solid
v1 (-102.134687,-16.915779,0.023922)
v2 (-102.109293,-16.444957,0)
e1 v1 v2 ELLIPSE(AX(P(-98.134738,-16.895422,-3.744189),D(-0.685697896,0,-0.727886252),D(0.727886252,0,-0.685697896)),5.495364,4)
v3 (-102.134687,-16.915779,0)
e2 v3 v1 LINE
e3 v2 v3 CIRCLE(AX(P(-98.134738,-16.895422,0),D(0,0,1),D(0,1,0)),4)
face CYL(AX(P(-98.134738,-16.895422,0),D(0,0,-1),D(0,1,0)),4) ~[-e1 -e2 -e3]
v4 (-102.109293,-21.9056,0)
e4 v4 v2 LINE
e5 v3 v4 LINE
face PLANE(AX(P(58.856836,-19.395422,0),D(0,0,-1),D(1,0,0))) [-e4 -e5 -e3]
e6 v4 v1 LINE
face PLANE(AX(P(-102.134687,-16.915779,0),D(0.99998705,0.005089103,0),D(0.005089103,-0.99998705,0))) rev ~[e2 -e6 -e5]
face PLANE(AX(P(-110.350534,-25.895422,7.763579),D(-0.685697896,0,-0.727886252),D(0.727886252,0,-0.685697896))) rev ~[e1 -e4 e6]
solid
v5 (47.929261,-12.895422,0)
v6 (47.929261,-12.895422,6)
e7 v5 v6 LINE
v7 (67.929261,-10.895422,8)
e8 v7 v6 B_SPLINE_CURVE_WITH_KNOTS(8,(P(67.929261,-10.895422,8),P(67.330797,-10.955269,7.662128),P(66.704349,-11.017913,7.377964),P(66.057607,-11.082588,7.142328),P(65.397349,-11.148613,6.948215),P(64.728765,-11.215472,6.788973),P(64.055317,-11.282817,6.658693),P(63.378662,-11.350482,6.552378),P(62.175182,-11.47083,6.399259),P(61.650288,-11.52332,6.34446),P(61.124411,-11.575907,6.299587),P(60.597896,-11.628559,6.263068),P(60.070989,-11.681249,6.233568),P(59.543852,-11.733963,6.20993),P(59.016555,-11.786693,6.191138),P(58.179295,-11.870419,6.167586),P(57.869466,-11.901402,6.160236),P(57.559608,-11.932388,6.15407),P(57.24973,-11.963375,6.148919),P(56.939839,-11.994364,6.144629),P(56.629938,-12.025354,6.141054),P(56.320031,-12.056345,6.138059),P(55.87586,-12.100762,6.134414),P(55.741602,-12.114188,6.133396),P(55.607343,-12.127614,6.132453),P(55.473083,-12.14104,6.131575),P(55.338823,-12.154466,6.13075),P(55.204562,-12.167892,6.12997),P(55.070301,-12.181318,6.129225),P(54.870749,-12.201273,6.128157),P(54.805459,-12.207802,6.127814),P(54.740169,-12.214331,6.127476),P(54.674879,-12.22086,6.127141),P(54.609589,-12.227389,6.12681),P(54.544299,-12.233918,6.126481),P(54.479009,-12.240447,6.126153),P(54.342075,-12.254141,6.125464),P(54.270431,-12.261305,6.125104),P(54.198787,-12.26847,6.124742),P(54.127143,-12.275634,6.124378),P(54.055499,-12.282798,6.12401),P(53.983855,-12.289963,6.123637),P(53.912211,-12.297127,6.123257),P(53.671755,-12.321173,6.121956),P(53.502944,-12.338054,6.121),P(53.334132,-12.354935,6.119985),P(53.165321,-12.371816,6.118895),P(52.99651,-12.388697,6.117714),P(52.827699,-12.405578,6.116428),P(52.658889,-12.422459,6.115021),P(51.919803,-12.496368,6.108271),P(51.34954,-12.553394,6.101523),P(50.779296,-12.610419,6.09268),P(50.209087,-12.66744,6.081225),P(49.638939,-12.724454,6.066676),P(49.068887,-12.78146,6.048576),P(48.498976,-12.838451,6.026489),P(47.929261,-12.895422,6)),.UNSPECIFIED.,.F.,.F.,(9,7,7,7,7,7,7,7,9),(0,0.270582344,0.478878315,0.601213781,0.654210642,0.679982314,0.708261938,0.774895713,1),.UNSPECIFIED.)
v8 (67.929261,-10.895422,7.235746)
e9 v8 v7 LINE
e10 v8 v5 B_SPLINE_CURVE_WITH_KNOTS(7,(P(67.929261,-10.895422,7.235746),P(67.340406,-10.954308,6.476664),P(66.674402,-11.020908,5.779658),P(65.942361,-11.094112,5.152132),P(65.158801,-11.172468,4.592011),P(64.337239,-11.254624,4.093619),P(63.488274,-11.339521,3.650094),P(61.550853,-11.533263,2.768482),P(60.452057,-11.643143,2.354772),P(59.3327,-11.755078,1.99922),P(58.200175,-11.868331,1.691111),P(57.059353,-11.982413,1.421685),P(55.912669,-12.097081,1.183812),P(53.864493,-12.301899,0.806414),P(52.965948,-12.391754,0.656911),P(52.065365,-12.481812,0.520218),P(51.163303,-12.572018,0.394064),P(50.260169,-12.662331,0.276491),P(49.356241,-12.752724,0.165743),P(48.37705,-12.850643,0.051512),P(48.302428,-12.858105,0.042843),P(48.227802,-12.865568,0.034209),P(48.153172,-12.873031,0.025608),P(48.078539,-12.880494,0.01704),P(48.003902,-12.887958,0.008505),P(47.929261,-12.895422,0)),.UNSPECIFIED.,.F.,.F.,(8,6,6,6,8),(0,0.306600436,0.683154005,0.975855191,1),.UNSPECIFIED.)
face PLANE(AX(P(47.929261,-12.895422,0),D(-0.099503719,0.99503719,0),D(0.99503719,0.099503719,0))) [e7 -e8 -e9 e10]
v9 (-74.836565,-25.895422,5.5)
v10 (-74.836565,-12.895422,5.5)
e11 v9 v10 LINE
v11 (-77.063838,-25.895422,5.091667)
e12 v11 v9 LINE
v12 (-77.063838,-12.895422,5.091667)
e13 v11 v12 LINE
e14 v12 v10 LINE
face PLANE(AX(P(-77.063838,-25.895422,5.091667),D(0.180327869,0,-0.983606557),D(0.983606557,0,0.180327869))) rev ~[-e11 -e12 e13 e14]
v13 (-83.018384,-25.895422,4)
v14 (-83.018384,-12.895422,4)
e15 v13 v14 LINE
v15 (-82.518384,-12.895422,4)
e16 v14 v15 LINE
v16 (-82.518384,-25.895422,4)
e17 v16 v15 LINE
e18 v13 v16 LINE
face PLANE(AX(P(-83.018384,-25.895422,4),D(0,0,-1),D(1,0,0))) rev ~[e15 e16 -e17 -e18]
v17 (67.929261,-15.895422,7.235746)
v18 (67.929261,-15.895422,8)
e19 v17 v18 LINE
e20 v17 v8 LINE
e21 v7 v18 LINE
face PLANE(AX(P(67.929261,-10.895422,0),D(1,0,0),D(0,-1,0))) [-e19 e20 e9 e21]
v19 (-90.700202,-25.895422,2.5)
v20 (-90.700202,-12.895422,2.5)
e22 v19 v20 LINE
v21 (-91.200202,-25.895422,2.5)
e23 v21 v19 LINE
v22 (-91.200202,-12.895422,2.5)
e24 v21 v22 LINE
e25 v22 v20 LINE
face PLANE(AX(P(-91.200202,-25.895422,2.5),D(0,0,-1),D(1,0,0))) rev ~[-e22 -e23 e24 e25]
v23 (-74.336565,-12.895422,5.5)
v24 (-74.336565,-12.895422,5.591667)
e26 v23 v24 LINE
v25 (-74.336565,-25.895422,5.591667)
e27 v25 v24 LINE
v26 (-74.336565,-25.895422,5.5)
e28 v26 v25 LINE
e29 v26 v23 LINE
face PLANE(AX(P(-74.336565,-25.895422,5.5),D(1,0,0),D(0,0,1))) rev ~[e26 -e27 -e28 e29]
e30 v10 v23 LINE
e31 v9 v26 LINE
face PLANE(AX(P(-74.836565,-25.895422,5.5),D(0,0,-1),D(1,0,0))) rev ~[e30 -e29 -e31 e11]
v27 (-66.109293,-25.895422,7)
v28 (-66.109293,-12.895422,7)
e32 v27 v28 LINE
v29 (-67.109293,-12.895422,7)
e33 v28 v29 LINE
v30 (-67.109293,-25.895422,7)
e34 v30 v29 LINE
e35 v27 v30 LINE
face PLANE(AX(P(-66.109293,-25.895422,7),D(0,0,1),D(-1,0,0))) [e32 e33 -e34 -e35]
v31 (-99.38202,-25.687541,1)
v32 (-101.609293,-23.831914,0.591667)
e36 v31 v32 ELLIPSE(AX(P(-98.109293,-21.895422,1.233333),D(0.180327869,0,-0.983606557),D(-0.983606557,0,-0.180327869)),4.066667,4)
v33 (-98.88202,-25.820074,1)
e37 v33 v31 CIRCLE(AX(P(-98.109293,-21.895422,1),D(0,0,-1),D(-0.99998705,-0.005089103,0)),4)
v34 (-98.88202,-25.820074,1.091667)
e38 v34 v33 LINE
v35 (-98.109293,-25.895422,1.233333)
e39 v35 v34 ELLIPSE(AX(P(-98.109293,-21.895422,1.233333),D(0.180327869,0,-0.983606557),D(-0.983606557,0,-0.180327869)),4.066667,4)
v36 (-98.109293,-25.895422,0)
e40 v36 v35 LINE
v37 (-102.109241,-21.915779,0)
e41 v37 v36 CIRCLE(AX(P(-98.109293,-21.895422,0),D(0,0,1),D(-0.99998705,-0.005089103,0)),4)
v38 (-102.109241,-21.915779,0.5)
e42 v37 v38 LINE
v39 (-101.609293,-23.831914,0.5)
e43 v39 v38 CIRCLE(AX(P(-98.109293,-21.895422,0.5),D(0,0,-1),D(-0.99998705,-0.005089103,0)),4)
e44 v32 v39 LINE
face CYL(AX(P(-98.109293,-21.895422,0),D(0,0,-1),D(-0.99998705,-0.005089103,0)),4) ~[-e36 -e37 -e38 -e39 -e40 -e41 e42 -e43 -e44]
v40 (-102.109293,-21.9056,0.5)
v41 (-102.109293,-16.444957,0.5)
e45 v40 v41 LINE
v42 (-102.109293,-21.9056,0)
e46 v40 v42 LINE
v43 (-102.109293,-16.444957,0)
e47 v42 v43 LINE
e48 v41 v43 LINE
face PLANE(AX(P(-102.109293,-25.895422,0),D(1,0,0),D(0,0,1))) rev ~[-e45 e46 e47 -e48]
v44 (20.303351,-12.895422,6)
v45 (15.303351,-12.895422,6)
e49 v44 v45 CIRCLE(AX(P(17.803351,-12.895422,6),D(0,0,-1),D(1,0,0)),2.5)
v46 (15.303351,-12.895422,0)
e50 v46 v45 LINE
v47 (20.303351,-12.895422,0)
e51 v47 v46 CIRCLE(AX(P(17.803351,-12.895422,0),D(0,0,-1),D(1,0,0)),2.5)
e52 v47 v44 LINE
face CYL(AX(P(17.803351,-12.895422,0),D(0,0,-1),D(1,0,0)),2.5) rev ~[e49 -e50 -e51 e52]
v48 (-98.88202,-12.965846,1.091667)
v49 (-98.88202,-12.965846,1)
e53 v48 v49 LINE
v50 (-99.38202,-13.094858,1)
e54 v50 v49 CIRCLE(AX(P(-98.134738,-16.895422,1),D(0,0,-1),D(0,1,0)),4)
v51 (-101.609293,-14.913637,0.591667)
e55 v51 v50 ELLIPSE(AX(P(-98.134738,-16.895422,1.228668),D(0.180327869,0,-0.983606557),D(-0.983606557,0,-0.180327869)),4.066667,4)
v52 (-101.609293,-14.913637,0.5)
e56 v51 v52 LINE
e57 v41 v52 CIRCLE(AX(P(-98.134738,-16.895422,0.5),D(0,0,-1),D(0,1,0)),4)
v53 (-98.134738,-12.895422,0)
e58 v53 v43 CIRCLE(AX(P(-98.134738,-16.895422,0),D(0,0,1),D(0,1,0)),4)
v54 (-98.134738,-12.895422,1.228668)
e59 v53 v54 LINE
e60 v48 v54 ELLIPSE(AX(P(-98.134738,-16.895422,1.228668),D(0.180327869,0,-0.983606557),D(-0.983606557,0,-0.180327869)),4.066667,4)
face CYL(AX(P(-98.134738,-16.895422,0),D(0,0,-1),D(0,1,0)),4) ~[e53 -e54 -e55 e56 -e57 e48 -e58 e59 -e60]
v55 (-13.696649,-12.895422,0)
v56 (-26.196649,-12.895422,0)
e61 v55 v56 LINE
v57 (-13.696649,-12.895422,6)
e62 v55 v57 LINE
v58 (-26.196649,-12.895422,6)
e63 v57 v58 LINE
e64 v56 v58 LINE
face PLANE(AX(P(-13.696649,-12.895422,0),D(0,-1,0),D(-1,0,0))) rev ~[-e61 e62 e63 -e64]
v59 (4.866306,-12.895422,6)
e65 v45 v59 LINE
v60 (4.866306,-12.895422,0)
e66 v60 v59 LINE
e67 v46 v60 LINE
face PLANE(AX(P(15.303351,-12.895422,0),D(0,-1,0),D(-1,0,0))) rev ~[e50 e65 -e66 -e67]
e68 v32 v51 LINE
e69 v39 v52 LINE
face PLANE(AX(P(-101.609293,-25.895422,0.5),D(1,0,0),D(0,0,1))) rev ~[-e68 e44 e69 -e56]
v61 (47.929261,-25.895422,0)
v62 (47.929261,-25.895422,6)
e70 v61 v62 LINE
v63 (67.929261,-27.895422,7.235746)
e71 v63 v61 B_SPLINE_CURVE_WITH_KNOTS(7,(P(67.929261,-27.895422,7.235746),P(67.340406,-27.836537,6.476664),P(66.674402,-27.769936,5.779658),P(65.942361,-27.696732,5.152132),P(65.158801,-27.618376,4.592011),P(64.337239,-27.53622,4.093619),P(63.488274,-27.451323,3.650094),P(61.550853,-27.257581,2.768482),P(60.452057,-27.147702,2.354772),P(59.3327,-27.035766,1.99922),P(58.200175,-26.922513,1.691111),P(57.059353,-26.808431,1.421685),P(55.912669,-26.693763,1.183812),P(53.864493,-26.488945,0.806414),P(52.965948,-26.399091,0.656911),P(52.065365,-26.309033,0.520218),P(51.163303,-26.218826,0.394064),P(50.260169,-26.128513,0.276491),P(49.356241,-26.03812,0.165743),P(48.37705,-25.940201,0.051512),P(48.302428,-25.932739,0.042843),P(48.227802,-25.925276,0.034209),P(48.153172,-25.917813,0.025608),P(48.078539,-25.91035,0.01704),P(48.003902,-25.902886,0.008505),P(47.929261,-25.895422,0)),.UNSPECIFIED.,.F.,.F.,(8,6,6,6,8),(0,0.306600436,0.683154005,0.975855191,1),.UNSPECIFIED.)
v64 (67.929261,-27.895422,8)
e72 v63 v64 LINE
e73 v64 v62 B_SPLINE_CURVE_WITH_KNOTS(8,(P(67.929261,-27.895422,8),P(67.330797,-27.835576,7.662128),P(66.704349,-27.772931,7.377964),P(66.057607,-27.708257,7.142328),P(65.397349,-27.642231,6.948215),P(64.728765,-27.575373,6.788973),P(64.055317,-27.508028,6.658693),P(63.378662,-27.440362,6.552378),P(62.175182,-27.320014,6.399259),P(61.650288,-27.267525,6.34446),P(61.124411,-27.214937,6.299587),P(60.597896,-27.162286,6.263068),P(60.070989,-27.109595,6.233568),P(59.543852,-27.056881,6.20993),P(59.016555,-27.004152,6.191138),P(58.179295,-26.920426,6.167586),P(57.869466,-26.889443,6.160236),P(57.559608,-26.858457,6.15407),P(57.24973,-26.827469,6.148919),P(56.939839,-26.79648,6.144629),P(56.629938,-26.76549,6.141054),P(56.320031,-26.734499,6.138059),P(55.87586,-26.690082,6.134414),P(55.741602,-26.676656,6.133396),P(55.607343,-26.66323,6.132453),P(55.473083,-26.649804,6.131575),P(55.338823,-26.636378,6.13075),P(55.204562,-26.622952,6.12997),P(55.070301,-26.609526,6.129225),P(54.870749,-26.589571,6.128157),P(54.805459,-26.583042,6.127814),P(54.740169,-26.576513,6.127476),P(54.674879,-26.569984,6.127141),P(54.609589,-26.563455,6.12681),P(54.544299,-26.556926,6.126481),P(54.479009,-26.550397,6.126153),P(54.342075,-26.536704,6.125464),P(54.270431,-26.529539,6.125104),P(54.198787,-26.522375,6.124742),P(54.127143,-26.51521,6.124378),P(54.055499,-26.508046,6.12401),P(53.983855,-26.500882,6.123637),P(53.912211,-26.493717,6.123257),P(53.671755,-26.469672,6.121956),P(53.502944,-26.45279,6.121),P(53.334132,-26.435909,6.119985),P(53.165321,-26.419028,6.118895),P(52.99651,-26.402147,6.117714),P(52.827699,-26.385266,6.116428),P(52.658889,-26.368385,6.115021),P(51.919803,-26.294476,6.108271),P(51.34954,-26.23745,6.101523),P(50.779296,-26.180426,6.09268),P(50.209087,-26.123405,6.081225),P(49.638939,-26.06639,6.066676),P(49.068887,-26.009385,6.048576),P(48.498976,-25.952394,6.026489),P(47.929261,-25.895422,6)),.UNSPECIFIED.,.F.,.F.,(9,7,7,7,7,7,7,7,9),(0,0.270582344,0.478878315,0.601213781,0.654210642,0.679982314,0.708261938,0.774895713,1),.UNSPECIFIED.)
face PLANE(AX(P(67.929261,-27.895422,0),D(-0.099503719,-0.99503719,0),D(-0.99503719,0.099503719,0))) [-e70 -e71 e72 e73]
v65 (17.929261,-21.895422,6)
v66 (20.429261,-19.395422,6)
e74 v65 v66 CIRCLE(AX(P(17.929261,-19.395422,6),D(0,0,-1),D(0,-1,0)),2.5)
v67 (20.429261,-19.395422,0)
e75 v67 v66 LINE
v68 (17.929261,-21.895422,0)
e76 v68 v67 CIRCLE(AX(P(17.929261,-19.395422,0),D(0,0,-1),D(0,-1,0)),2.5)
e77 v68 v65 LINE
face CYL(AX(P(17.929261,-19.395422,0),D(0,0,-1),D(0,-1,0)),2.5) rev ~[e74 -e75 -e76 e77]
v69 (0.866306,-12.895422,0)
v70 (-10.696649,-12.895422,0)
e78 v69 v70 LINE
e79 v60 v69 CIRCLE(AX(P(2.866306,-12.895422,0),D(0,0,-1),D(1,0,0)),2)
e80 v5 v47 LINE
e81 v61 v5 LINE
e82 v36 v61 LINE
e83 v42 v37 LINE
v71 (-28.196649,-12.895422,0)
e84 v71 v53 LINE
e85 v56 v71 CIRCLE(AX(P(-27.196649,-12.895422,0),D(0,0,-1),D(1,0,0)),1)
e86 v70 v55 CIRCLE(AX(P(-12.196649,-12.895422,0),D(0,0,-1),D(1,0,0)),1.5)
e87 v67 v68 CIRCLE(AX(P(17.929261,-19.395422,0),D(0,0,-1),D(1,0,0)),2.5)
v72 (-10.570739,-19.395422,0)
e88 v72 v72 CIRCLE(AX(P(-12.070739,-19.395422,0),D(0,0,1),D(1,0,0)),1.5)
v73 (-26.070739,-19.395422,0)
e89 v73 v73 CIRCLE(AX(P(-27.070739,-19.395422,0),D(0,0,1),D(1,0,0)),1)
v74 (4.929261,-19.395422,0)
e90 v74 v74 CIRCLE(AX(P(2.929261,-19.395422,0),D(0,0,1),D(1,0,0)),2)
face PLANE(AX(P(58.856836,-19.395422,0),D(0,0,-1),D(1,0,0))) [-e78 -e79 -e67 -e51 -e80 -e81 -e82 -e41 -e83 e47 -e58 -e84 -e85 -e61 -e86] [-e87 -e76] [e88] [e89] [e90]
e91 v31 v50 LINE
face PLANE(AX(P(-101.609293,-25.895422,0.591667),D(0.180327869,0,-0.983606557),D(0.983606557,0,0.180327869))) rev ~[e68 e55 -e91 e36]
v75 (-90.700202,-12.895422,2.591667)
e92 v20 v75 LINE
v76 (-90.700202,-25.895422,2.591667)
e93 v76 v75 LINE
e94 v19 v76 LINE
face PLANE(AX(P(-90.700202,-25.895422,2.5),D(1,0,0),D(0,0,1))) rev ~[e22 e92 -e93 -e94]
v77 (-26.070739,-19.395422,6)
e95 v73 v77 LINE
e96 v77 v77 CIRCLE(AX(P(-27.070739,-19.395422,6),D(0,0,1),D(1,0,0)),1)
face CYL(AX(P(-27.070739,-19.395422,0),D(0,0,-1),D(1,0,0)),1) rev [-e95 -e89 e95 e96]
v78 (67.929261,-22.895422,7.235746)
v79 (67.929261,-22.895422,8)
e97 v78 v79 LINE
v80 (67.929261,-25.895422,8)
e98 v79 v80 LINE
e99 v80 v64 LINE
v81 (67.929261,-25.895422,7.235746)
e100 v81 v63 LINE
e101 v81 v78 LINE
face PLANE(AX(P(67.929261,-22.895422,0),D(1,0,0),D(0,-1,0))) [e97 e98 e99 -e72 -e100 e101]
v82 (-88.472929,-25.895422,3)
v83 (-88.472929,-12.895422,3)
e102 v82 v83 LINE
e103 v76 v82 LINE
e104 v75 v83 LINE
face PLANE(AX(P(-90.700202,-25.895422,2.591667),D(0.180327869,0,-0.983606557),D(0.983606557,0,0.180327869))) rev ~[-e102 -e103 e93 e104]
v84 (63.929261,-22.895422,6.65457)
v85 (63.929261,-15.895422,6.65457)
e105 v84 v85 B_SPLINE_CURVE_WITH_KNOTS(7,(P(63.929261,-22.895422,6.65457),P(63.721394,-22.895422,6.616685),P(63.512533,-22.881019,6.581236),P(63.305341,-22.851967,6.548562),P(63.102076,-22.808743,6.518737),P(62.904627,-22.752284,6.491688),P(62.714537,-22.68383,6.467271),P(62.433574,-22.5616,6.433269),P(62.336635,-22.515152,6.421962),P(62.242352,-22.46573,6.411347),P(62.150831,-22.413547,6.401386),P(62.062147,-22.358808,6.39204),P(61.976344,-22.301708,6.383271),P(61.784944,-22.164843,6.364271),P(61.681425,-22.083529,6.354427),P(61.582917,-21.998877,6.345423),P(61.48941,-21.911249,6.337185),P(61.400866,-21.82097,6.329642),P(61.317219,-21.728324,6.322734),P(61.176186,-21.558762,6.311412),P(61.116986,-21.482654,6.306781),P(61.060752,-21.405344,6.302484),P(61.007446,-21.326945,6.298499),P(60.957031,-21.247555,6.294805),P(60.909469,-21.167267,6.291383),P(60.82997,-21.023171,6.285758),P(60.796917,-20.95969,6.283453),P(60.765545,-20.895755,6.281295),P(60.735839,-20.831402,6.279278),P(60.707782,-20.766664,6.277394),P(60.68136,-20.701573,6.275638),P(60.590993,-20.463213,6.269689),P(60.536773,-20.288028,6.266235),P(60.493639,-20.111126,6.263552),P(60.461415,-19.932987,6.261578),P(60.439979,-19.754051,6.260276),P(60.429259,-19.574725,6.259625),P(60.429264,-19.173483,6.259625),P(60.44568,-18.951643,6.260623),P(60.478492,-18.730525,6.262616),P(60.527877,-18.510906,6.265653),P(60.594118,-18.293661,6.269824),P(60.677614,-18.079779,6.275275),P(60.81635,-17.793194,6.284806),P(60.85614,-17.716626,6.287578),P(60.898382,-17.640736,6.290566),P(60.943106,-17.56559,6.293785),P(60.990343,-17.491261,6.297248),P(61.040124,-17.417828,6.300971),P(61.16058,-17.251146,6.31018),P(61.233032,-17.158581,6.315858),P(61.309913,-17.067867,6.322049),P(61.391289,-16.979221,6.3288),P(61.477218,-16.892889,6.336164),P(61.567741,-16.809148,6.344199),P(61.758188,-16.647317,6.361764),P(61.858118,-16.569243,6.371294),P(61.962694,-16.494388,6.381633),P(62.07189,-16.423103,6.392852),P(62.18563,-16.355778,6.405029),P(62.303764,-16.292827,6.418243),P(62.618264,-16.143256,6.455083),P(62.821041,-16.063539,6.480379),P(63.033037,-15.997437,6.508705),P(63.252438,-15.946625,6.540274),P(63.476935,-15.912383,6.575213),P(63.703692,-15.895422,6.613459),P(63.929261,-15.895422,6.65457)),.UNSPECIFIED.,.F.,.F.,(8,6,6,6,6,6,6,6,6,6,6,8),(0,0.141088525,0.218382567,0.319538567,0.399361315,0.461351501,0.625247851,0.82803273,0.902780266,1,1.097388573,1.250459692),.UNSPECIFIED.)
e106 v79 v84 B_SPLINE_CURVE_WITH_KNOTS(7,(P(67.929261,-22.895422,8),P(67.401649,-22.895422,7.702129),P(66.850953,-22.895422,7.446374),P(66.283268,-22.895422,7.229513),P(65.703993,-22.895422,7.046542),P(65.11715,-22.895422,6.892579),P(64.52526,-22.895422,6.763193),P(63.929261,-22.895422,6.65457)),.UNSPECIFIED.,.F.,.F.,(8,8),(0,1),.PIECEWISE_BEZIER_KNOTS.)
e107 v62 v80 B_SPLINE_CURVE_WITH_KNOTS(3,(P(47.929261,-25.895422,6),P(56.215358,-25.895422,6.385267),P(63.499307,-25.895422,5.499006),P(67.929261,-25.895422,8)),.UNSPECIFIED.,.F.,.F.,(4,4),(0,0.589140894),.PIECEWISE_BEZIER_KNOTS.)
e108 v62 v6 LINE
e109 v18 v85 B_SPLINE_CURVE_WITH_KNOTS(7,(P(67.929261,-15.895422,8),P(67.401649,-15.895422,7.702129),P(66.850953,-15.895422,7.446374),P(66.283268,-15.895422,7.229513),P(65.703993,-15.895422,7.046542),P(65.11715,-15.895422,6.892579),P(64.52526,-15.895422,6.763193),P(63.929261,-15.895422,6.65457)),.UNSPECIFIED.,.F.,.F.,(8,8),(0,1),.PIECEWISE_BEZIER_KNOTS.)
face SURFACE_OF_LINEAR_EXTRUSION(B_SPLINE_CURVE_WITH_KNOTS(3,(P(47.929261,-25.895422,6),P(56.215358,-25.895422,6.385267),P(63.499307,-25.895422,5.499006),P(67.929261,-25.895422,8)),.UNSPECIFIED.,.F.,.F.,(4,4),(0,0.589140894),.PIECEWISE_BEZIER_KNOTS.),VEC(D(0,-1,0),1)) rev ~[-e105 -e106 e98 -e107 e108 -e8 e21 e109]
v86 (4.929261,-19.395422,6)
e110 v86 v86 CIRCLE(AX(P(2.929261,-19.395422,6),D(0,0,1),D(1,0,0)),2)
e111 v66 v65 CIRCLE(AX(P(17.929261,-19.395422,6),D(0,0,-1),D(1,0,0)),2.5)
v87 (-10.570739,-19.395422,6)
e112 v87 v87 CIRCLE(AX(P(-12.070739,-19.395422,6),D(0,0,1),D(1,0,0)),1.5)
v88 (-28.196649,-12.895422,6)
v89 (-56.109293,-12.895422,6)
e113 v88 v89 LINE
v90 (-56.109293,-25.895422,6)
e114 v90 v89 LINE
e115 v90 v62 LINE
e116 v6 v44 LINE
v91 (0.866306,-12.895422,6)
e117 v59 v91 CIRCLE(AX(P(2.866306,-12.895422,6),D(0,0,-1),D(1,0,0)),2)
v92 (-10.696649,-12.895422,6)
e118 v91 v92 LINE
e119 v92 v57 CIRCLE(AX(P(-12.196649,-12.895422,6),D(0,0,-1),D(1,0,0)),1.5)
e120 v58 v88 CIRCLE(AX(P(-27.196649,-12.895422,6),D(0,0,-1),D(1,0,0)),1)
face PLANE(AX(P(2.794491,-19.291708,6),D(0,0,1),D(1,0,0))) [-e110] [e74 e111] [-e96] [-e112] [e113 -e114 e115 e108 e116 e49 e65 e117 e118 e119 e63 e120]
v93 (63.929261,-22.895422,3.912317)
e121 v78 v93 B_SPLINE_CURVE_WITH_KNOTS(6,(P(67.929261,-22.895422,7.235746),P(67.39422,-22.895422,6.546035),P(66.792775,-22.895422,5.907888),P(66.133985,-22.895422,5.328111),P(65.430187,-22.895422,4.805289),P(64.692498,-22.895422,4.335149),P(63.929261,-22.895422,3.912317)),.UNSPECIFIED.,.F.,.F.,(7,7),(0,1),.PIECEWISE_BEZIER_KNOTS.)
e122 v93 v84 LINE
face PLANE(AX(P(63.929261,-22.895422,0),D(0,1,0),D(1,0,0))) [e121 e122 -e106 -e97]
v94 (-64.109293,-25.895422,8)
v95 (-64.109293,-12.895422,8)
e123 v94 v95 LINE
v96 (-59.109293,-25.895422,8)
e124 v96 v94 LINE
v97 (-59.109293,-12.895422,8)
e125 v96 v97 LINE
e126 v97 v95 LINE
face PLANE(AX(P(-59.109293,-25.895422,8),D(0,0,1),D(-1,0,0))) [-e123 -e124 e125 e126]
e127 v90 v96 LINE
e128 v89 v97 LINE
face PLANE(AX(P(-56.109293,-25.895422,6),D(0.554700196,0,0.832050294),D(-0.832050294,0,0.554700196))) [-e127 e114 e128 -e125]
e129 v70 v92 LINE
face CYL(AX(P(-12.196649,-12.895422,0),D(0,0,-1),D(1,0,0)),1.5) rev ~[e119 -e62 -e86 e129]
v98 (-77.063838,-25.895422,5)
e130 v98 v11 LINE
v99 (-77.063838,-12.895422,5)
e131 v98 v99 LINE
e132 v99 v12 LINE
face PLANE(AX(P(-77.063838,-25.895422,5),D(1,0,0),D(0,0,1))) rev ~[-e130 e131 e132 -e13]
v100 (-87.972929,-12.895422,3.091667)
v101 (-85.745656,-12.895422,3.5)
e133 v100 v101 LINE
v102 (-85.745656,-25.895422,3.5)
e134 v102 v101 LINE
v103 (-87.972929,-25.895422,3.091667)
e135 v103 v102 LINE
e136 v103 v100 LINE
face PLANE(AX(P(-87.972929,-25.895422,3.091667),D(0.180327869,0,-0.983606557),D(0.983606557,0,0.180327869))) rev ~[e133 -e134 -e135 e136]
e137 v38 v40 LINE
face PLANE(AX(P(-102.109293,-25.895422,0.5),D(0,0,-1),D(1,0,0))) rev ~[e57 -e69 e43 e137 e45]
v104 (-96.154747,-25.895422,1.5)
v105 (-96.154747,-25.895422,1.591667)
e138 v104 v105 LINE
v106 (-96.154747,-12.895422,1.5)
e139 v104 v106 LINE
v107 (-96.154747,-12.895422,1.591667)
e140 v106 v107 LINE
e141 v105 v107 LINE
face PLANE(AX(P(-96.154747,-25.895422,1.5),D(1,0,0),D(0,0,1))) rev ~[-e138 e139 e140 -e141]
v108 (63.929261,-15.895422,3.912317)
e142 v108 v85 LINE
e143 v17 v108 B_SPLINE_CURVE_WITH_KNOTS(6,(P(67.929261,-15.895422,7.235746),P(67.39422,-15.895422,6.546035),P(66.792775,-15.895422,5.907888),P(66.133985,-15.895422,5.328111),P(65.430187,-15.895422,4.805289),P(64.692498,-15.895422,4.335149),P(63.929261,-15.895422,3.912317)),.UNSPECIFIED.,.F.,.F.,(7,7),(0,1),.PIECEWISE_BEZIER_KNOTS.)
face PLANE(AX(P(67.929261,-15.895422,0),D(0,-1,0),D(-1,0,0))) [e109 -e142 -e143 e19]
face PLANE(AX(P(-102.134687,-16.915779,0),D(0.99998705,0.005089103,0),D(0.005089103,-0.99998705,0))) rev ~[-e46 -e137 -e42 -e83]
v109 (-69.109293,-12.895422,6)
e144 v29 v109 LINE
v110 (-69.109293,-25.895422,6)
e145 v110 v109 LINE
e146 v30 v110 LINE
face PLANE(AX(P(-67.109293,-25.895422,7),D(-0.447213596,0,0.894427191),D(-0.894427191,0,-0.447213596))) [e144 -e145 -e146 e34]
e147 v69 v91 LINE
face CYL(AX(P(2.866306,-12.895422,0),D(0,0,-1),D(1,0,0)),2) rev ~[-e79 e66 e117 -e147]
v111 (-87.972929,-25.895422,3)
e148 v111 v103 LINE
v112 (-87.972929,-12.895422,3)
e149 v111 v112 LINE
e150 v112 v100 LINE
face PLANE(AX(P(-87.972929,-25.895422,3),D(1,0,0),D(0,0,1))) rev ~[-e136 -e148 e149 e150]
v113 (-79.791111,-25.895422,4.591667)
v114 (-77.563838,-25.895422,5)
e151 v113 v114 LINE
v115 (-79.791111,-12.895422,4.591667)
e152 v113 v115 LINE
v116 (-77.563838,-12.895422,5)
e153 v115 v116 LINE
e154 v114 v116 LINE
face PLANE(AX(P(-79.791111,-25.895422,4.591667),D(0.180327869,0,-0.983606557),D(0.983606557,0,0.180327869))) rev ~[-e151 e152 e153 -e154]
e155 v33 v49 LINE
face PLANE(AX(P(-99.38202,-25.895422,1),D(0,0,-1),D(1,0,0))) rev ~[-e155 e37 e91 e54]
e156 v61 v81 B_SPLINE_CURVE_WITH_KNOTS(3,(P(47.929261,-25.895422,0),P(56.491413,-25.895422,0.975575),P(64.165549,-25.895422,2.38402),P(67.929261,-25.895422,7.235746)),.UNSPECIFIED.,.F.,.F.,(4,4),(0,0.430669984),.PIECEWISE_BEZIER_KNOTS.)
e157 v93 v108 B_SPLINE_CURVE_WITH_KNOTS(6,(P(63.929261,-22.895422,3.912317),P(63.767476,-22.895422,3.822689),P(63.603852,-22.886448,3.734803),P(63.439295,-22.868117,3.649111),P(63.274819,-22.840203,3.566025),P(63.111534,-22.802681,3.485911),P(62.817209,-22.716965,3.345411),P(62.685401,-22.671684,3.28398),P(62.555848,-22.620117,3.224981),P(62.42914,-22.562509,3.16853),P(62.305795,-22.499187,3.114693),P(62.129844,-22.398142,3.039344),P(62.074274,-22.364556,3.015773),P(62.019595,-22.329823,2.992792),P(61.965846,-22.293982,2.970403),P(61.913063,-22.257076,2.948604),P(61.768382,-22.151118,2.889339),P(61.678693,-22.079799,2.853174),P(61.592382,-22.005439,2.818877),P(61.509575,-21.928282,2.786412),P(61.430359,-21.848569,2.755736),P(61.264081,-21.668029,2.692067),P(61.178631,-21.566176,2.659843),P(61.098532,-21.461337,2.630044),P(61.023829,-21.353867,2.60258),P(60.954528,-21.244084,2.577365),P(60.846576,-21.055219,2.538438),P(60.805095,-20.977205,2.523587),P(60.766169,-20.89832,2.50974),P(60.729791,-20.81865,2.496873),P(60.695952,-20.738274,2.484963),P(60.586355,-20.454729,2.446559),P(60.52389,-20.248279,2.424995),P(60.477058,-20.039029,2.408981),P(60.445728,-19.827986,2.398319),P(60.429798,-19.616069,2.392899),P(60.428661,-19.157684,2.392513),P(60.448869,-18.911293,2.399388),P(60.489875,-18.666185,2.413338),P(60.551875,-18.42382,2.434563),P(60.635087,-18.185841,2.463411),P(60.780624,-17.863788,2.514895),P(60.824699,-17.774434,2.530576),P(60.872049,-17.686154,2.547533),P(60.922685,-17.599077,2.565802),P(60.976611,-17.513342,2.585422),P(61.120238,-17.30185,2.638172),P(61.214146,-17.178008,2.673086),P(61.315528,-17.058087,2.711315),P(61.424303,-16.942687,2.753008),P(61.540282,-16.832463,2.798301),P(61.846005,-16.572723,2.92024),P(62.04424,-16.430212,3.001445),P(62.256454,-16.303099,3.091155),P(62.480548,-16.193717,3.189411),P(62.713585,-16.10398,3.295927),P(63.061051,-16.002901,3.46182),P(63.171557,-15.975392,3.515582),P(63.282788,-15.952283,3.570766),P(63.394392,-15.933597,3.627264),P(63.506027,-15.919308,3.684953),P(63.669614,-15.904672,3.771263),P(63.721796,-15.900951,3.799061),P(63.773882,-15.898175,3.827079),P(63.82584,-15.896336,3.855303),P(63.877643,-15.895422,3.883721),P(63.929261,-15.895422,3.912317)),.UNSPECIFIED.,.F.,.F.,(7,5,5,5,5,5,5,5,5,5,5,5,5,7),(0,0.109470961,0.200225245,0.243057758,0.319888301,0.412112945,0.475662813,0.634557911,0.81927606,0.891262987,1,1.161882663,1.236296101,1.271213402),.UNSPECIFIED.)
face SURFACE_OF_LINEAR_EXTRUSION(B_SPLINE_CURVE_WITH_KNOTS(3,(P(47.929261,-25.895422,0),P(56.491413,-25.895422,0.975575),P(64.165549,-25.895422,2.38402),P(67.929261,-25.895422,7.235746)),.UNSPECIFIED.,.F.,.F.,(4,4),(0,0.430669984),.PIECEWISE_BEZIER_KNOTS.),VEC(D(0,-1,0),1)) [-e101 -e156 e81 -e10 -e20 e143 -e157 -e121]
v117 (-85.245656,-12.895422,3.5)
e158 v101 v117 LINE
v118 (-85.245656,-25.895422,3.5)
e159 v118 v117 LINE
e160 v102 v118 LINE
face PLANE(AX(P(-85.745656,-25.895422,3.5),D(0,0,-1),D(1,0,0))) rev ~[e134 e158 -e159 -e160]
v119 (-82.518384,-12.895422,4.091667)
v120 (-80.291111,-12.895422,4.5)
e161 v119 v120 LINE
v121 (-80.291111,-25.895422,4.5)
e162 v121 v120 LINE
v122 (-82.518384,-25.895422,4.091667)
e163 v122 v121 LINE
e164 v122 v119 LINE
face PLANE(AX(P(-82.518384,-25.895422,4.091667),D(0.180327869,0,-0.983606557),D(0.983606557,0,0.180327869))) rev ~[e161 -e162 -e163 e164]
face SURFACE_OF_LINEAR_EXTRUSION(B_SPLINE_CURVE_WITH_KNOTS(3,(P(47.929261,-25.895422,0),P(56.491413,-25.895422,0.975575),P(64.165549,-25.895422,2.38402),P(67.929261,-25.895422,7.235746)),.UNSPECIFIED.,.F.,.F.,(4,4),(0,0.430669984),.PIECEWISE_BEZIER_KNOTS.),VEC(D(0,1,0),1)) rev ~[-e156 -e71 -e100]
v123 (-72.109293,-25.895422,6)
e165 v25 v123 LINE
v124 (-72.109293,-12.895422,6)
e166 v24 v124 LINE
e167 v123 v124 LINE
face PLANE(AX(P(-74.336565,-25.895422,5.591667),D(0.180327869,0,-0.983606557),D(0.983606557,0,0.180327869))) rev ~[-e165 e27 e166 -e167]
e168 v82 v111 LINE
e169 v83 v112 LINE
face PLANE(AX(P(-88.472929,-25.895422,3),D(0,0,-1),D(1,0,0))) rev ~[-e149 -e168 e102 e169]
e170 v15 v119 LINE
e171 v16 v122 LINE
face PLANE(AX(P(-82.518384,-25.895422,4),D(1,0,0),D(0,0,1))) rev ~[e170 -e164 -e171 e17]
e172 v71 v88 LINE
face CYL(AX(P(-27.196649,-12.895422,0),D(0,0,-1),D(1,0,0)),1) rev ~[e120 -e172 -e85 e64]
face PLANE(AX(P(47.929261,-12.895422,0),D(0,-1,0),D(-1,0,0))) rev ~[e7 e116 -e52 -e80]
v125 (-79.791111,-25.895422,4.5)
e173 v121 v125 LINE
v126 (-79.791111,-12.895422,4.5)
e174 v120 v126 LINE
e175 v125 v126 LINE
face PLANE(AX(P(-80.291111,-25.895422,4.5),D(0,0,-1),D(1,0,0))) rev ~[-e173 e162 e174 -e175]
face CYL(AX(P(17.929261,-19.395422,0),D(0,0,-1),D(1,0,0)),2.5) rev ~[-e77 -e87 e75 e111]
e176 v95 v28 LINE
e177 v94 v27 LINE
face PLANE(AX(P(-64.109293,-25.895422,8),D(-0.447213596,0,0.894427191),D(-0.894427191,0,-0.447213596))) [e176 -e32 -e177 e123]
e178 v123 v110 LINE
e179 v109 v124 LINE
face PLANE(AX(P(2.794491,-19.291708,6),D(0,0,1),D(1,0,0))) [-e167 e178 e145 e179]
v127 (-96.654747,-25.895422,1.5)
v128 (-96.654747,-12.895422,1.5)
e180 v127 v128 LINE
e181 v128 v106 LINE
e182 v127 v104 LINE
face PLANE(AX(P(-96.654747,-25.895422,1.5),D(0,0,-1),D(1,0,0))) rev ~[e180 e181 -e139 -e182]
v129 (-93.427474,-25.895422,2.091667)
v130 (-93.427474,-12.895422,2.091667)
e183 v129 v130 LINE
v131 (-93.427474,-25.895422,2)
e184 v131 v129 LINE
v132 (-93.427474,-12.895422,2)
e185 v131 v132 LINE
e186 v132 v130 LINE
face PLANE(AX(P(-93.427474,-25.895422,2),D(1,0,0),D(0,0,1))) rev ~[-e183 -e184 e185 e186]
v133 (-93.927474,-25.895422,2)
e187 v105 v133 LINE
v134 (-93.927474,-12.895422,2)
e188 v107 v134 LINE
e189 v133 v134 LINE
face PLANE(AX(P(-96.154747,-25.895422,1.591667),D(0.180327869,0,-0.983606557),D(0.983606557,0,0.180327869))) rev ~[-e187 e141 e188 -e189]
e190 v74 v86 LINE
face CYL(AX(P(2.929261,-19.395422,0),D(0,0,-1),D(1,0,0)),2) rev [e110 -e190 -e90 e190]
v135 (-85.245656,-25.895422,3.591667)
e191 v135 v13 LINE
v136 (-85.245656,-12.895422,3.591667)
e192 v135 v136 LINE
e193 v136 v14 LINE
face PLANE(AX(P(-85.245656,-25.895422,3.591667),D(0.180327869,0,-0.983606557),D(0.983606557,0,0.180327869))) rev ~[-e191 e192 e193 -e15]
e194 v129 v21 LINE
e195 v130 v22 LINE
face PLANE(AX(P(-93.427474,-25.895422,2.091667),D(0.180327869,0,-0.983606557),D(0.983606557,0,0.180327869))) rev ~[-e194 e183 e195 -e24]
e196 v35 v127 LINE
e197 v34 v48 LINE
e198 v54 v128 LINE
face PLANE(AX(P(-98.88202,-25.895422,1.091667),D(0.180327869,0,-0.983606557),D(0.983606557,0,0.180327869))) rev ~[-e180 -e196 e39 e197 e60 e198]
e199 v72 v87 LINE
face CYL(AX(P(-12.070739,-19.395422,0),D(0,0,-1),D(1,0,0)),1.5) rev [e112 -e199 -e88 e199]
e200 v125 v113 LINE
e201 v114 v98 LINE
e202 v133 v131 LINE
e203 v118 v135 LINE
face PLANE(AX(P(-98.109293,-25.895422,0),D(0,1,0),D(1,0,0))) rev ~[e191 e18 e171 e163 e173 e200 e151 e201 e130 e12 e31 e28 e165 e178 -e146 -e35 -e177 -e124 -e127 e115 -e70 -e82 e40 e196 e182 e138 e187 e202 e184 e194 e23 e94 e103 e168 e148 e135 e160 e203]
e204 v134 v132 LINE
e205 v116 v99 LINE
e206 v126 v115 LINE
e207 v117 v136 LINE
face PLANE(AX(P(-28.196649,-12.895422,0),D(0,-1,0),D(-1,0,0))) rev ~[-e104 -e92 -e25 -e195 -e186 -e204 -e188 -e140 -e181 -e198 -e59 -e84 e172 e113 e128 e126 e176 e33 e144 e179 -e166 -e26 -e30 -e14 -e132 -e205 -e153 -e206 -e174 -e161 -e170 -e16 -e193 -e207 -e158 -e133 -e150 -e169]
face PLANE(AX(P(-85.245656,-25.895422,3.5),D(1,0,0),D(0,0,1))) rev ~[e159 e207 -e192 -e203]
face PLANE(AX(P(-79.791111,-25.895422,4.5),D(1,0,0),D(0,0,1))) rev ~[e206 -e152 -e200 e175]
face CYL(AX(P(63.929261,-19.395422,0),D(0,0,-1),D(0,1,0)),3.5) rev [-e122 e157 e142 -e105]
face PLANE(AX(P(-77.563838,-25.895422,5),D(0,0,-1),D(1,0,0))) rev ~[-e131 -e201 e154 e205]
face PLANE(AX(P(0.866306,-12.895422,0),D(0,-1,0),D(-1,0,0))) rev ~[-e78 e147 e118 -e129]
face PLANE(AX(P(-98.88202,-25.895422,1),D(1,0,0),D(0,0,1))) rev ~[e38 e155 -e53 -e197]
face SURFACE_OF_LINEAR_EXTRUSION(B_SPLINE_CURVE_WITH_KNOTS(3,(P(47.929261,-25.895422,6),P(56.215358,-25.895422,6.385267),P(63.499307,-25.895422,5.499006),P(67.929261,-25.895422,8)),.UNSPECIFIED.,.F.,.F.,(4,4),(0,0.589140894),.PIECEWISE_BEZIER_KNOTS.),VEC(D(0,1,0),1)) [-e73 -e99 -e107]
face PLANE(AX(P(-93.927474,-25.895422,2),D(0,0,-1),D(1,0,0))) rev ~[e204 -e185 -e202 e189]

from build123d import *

# Parameters (mm, degrees)
F0_R          = 1
F0_R_2        = 1.5
F0_R_3        = 2
F1_DEPTH      = 6
F3_DEPTH      = 8
F5_DEPTH      = 25
F5_DEPTH_BACK = 25
F7_DEPTH      = 25
F9_DEPTH      = 13


# Not quite as in the source:
# - a feature names something its author has since deleted; it is built from what else it names


with BuildPart() as f1:
    # F0 (on Top) → F1 (new body)
    with BuildSketch(Plane.XY):
        with BuildLine():
            Line((-42.1966487169, -12.8954221606), (-42.1966487169, -25.8954221606))
            Line((-42.1966487169, -25.8954221606), (17.9292613268, -25.8954221606))
            Line((17.9292613268, -25.8954221606), (47.9292613268, -25.8954221606))
            Line((47.9292613268, -25.8954221606), (47.9292613268, -12.8954221606))
            Line((47.9292613268, -12.8954221606), (20.3033512831, -12.8954221606))
            ThreePointArc((20.3033512831, -12.8954221606), (17.8033512831, -15.3954221606), (15.3033512831, -12.8954221606))
            Line((15.3033512831, -12.8954221606), (4.8663063049, -12.8954221606))
            ThreePointArc((4.8663063049, -12.8954221606), (2.8663063049, -14.8954221606), (0.8663063049, -12.8954221606))
            Line((0.8663063049, -12.8954221606), (-10.6966487169, -12.8954221606))
            ThreePointArc((-10.6966487169, -12.8954221606), (-12.1966487169, -14.3954221606), (-13.6966487169, -12.8954221606))
            Line((-13.6966487169, -12.8954221606), (-26.1966487169, -12.8954221606))
            ThreePointArc((-26.1966487169, -12.8954221606), (-27.1966487169, -13.8954221606), (-28.1966487169, -12.8954221606))
            Line((-28.1966487169, -12.8954221606), (-42.1966487169, -12.8954221606))
        make_face()
        with Locations((-27.0707386732, -19.3954221606)):
            Circle(F0_R, mode=Mode.SUBTRACT)
        with Locations((-12.0707386732, -19.3954221606)):
            Circle(F0_R_2, mode=Mode.SUBTRACT)
        with Locations((2.9292613268, -19.3954221606)):
            Circle(F0_R_3, mode=Mode.SUBTRACT)
        with BuildLine():
            ThreePointArc((20.4292613268, -19.3954221606), (19.6970282798, -21.1631891136), (17.9292613268, -21.8954221606))
            ThreePointArc((17.9292613268, -21.8954221606), (16.1614943738, -17.6276552077), (20.4292613268, -19.3954221606))
        make_face(mode=Mode.SUBTRACT)
        with BuildLine():
            ThreePointArc((-102.1092408178, -21.9157785711), (-100.9305134828, -24.7310372299), (-98.109292616, -25.8954221606))
            Line((-98.109292616, -25.8954221606), (-42.1966487169, -25.8954221606))
            Line((-42.1966487169, -25.8954221606), (-42.1966487169, -12.8954221606))
            Line((-42.1966487169, -12.8954221606), (-98.1347384587, -12.8954221606))
            ThreePointArc((-98.1347384587, -12.8954221606), (-100.9703535279, -14.0742012939), (-102.1346866604, -16.9157785711))
            Line((-102.1346866604, -16.9157785711), (-102.1092408178, -21.9157785711))
        make_face()
    extrude(amount=F1_DEPTH)

    # F2 (on face) → F3 (join)
    with BuildSketch(Plane(origin=(0, 0, 0), x_dir=(1, 0, 0), z_dir=(0, 0, -1))):
        with BuildLine():
            Line((47.9292613268, 25.8954221606), (47.9292613268, 12.8954221606))
            Line((47.9292613268, 12.8954221606), (67.9292613268, 10.8954221606))
            Line((67.9292613268, 10.8954221606), (67.9292613268, 15.8954221606))
            Line((67.9292613268, 15.8954221606), (63.9292613268, 15.8954221606))
            ThreePointArc((63.9292613268, 15.8954221606), (60.4292613268, 19.3954221606), (63.9292613268, 22.8954221606))
            Line((63.9292613268, 22.8954221606), (67.9292613268, 22.8954221606))
            Line((67.9292613268, 22.8954221606), (67.9292613268, 27.8954221606))
            Line((67.9292613268, 27.8954221606), (47.9292613268, 25.8954221606))
        make_face()
    extrude(amount=-F3_DEPTH)

    # F4 (on face) → F5 (cut, two sides)
    with BuildSketch(Plane.XZ.offset(25.8954221606)) as f5_sk:
        with BuildLine():
            Line((46.540889889, 6), (47.9292613268, 6))
            add(Edge.make_bspline(
                [(47.9292613268, 6), (56.2153583024, 6.3852668293), (63.4993069571, 5.4990063105), (67.9292613268, 8)],
                knots=[0, 0, 0, 0, 0.5891408943, 0.5891408943, 0.5891408943, 0.5891408943], degree=3))
            add(Edge.make_bspline(
                [(67.9292613268, 8), (68.2487173743, 8.1803534511), (68.5533319552, 8.3783214507), (68.8425013824, 8.5922158425)],
                knots=[0.5891408943, 0.5891408943, 0.5891408943, 0.5891408943, 0.6316254451, 0.6316254451, 0.6316254451, 0.6316254451], degree=3))
            add(Edge.make_bspline(
                [(68.8425013824, 8.5922158425), (70.5907749543, 11.5561393325), (71.3452296215, 15.074575864), (72.5077323308, 15.8934572506)],
                knots=[0.4687959677, 0.4687959677, 0.4687959677, 0.4687959677, 0.7089887452, 0.7089887452, 0.7089887452, 0.7089887452], degree=3))
            add(Edge.make_bspline(
                [(72.5077323308, 15.8934572506), (72.5145030374, 15.8982266206), (72.5212875857, 15.9029044167), (72.5280862528, 15.9074899958)],
                knots=[0.7089887452, 0.7089887452, 0.7089887452, 0.7089887452, 0.710387688, 0.710387688, 0.710387688, 0.710387688], degree=3))
            Line((72.5280862528, 15.9074899958), (72.5280862528, 21.5322930813))
            Line((72.5280862528, 21.5322930813), (47.9292613268, 21.5322930813))
            Line((47.9292613268, 21.5322930813), (46.540889889, 21.5322930813))
            Line((46.540889889, 21.5322930813), (46.540889889, 6))
        make_face()
        with BuildLine():
            add(Edge.make_bspline(
                [(47.9292613268, 0), (56.4914134681, 0.9755749136), (64.1655487647, 2.3840198172), (67.9292613268, 7.2357458994)],
                knots=[0, 0, 0, 0, 0.4306699839, 0.4306699839, 0.4306699839, 0.4306699839], degree=3))
            Line((47.9292613268, 0), (47.9292613268, -3.928697668))
            Line((47.9292613268, -3.928697668), (72.5280862528, -3.928697668))
            Line((72.5280862528, -3.928697668), (72.5280862528, 15.9074899958))
            add(Edge.make_bspline(
                [(72.5077323308, 15.8934572506), (72.5145030374, 15.8982266206), (72.5212875857, 15.9029044167), (72.5280862528, 15.9074899958)],
                knots=[0.7089887452, 0.7089887452, 0.7089887452, 0.7089887452, 0.710387688, 0.710387688, 0.710387688, 0.710387688], degree=3))
            add(Edge.make_bspline(
                [(68.8425013824, 8.5922158425), (71.1489726079, 10.2982788409), (72.4728284355, 13.0175734735), (72.5077323308, 15.8934572506)],
                knots=[0.6316254451, 0.6316254451, 0.6316254451, 0.6316254451, 0.9704904314, 0.9704904314, 0.9704904314, 0.9704904314], degree=3))
            add(Edge.make_bspline(
                [(67.9292613268, 7.2357458994), (68.2624520517, 7.6652553541), (68.5649965775, 8.1217499937), (68.8425013824, 8.5922158425)],
                knots=[0.4306699839, 0.4306699839, 0.4306699839, 0.4306699839, 0.4687959677, 0.4687959677, 0.4687959677, 0.4687959677], degree=3))
        make_face()
    extrude(amount=-F5_DEPTH, mode=Mode.SUBTRACT)
    extrude(f5_sk.sketch, amount=F5_DEPTH_BACK, mode=Mode.SUBTRACT)

    # F6 (on face) → F7 (cut)
    with BuildSketch(Plane.XZ.offset(25.8954221606)):
        Polygon((-110.3505343199, 7.7635785565), (-102.109292616, 0), (-102.109292616, 0.5), (-101.609292616, 0.5), (-101.609292616, 0.5916666667), (-99.3820198888, 1), (-98.8820198888, 1), (-98.8820198888, 1.0916666667), (-96.6547471615, 1.5), (-96.1547471615, 1.5), (-96.1547471615, 1.5916666667), (-93.9274744342, 2), (-93.4274744342, 2), (-93.4274744342, 2.0916666667), (-91.200201707, 2.5), (-90.700201707, 2.5), (-90.700201707, 2.5916666667), (-88.4729289797, 3), (-87.9729289797, 3), (-87.9729289797, 3.0916666667), (-85.7456562524, 3.5), (-85.2456562524, 3.5), (-85.2456562524, 3.5916666667), (-83.0183835251, 4), (-82.5183835251, 4), (-82.5183835251, 4.0916666667), (-80.2911107979, 4.5), (-79.7911107979, 4.5), (-79.7911107979, 4.5916666667), (-77.5638380706, 5), (-77.0638380706, 5), (-77.0638380706, 5.0916666667), (-74.8365653433, 5.5), (-74.3365653433, 5.5), (-74.3365653433, 5.5916666667), (-72.109292616, 6), (-71.3678747416, 6.6357897595), (-76.816663146, 6.5958285704), (-98.5576808453, 7.7635785565), align=None)
    extrude(amount=-F7_DEPTH, mode=Mode.SUBTRACT)

    # F8 (on face) → F9 (join)
    with BuildSketch(Plane.XZ.offset(25.8954221606)):
        Polygon((-67.109292616, 7), (-69.109292616, 6), (-67.109292616, 6), (-56.109292616, 6), (-59.109292616, 8), (-64.109292616, 8), (-66.109292616, 7), align=None)
    extrude(amount=-F9_DEPTH)


solid = f1.part
